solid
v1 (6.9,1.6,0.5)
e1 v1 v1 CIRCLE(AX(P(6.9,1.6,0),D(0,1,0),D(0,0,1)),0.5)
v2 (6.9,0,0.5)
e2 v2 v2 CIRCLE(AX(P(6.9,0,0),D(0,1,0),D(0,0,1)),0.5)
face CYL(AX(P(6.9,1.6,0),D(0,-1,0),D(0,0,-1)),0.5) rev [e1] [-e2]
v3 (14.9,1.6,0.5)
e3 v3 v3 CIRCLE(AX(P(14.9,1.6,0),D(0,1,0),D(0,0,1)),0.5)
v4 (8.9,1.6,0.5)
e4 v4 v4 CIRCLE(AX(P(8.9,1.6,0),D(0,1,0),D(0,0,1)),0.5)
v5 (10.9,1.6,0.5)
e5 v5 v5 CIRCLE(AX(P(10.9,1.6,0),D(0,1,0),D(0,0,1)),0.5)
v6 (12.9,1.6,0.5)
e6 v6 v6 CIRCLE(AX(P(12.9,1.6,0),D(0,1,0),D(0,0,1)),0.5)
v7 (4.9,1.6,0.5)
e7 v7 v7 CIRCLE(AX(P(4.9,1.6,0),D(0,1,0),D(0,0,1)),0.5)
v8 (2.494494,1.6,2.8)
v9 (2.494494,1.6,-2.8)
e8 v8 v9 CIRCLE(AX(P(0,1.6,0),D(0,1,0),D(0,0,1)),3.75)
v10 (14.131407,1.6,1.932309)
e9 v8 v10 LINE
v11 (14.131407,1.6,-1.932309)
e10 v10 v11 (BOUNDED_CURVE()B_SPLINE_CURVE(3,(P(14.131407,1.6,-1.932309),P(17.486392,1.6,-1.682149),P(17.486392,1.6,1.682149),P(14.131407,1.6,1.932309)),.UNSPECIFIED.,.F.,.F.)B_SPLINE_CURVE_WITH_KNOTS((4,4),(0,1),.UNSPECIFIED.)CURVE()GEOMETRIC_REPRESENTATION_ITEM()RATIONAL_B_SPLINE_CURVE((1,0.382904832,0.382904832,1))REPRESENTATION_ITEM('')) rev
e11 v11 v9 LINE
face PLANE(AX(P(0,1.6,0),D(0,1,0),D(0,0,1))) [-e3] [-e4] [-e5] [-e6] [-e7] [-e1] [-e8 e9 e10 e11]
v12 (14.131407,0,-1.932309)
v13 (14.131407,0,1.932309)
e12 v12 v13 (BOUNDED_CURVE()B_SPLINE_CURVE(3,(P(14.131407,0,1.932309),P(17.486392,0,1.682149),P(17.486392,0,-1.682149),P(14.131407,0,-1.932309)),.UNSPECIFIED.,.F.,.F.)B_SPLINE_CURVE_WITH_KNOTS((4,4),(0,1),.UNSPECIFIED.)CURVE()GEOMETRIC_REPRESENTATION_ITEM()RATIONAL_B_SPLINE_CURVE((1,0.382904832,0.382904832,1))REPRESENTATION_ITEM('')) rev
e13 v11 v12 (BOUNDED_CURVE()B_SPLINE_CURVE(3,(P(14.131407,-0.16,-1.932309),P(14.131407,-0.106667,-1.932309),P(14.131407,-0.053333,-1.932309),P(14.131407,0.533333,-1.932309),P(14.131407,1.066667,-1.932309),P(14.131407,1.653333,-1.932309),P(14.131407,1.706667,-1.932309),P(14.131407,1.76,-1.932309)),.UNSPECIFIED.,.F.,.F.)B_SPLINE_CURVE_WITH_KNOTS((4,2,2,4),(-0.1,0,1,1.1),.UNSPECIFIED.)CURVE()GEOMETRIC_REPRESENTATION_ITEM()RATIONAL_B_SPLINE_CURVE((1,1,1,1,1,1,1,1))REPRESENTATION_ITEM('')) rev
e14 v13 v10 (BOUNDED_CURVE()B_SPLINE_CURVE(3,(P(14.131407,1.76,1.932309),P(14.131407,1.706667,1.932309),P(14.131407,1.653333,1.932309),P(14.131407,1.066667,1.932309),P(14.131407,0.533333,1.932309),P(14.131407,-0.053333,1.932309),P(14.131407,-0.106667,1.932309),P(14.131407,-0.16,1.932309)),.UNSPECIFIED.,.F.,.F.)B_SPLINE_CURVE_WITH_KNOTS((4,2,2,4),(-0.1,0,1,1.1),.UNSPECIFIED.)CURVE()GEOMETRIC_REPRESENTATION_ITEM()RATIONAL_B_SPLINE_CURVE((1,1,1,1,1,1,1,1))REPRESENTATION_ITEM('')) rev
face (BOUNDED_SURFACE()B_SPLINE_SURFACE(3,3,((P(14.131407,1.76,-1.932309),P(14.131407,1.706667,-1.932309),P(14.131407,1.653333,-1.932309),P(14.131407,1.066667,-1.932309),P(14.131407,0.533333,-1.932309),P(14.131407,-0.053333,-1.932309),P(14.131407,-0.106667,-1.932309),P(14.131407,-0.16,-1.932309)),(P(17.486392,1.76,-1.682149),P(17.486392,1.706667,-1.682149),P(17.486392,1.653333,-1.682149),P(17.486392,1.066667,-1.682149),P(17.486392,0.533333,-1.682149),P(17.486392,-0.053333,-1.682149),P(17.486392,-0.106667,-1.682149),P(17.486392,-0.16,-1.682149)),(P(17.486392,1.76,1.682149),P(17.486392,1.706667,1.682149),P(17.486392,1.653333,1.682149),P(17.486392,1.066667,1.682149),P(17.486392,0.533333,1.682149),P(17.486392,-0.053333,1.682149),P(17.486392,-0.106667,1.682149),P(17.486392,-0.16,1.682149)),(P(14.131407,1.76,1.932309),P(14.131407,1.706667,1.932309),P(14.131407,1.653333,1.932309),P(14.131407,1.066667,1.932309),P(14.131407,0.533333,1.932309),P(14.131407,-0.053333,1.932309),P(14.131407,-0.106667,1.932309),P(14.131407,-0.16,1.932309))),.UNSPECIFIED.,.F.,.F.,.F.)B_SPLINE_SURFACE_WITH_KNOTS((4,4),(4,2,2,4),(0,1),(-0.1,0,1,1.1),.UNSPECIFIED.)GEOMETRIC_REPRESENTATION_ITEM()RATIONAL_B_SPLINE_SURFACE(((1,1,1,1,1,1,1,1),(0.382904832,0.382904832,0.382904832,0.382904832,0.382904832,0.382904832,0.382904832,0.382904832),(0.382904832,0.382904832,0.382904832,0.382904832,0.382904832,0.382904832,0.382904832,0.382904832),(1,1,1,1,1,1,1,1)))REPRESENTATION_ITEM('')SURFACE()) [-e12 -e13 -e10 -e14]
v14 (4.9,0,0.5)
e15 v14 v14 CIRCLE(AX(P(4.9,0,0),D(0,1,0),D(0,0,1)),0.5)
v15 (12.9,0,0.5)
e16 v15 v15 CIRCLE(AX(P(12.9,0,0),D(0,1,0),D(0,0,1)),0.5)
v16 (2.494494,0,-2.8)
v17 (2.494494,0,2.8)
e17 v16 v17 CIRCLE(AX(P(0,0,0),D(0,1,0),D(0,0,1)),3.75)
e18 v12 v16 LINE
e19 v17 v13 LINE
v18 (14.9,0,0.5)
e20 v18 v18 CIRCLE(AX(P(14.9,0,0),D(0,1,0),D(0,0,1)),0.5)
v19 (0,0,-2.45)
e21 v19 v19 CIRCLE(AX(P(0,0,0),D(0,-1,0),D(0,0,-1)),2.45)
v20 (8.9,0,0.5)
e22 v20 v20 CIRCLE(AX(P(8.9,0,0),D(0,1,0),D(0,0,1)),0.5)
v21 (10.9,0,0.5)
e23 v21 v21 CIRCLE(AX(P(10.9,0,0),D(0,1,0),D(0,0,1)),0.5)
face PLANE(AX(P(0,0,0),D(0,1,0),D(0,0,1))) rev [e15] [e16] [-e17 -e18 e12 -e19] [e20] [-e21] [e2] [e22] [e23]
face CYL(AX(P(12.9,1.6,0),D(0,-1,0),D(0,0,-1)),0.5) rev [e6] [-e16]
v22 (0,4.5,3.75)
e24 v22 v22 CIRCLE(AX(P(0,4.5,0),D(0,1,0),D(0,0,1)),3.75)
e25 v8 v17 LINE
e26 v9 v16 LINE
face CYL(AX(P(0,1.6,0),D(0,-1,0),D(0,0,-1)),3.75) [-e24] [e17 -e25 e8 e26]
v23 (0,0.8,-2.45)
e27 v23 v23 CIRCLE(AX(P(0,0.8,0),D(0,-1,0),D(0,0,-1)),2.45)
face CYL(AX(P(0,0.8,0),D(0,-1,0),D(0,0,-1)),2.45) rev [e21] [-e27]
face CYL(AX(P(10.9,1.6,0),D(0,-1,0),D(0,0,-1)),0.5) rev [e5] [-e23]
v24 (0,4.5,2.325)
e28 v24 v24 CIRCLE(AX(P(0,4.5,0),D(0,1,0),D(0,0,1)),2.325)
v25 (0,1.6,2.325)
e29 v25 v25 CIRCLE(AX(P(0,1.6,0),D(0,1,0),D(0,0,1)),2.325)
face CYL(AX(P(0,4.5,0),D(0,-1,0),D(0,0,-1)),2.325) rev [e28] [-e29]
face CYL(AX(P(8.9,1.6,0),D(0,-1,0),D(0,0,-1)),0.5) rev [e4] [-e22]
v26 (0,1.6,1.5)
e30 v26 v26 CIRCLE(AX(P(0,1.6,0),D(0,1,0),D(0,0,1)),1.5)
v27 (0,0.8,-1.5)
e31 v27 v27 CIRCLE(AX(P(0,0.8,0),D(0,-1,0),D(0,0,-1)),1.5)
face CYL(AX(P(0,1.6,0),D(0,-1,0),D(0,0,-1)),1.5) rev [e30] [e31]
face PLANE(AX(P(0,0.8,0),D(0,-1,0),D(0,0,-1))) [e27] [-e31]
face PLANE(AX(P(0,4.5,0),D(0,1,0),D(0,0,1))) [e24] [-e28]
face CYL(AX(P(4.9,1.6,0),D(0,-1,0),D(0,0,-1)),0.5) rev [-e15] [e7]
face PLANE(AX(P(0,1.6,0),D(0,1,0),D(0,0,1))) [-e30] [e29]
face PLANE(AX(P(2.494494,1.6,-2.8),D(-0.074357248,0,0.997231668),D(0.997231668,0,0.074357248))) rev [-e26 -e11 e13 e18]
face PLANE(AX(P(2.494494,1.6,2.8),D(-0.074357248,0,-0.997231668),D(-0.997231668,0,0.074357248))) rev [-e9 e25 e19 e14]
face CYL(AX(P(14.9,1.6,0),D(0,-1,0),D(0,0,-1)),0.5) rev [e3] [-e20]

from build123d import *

# Parameters (mm, degrees)
SKETCH1_R               = 0.5
SKETCH1_R_2             = 1.5
BOSS_EXTRUDE1_DEPTH     = 1.6
SKETCH2_R               = 3.75
SKETCH2_R_2             = 2.325
BOSS_EXTRUDE2_DEPTH     = 2.9
FILLET1_START           = -1
FILLET1_DEPTH           = 4
FILLET2_START           = -1
FILLET2_DEPTH           = 4
SKETCH3_R               = 2.45
CUT_EXTRUDE1_DEPTH      = 0.8
ENL_V_START             = -10
ENL_V_MAT_EXTRU_1_DEPTH = 10


with BuildPart() as part:
    # Sketch1 → Boss-Extrude1 (new body)
    with BuildSketch(Plane(origin=(0, 0, 0), x_dir=(1, 0, 0), z_dir=(0, 1, 0))):
        with BuildLine():
            Line((2.494493937, 2.8), (14.9, 1.875))
            ThreePointArc((14.9, 1.875), (15.925, 0), (14.9, -1.875))
            Line((14.9, -1.875), (2.494493937, -2.8))
            ThreePointArc((2.494493937, -2.8), (0, -3.75), (-2.494493937, -2.8))
            Line((-2.494493937, -2.8), (-14.9, -1.875))
            ThreePointArc((-14.9, -1.875), (-15.925, 0), (-14.9, 1.875))
            Line((-14.9, 1.875), (-2.494493937, 2.8))
            ThreePointArc((-2.494493937, 2.8), (0, 3.75), (2.494493937, 2.8))
        make_face()
        with Locations(Location((4.9, 0, 0), (0, 0, 270))):
            Circle(SKETCH1_R, mode=Mode.SUBTRACT)
        with Locations(Location((6.9, 0, 0), (0, 0, 270))):
            Circle(SKETCH1_R, mode=Mode.SUBTRACT)
        with Locations(Location((8.9, 0, 0), (0, 0, 270))):
            Circle(SKETCH1_R, mode=Mode.SUBTRACT)
        with Locations(Location((10.9, 0, 0), (0, 0, 270))):
            Circle(SKETCH1_R, mode=Mode.SUBTRACT)
        with Locations(Location((12.9, 0, 0), (0, 0, 270))):
            Circle(SKETCH1_R, mode=Mode.SUBTRACT)
        with Locations(Location((14.9, 0, 0), (0, 0, 270))):
            Circle(SKETCH1_R, mode=Mode.SUBTRACT)
        with Locations(Location((-14.9, 0, 0), (0, 0, 90))):
            Circle(SKETCH1_R, mode=Mode.SUBTRACT)
        with Locations(Location((-12.9, 0, 0), (0, 0, 90))):
            Circle(SKETCH1_R, mode=Mode.SUBTRACT)
        with Locations(Location((-10.9, 0, 0), (0, 0, 90))):
            Circle(SKETCH1_R, mode=Mode.SUBTRACT)
        with Locations(Location((-8.9, 0, 0), (0, 0, 90))):
            Circle(SKETCH1_R, mode=Mode.SUBTRACT)
        with Locations(Location((-6.9, 0, 0), (0, 0, 90))):
            Circle(SKETCH1_R, mode=Mode.SUBTRACT)
        with Locations(Location((-4.9, 0, 0), (0, 0, 90))):
            Circle(SKETCH1_R, mode=Mode.SUBTRACT)
        with Locations(Location((0, 0, 0), (0, 0, 270))):
            Circle(SKETCH1_R_2, mode=Mode.SUBTRACT)
    extrude(amount=BOSS_EXTRUDE1_DEPTH)

    # Sketch2 → Boss-Extrude2 (add)
    with BuildSketch(Plane(origin=(0, 1.6, 0), x_dir=(1, 0, 0), z_dir=(0, 1, 0))):
        with Locations(Location((0, 0, 0), (0, 0, 48.302453397))):
            Circle(SKETCH2_R)
        with Locations(Location((0, 0, 0), (0, 0, 270))):
            Circle(SKETCH2_R_2, mode=Mode.SUBTRACT)
    extrude(amount=BOSS_EXTRUDE2_DEPTH)

    # Fillet1: read off the stored shape, not the designer's step
    # Fillet1 outline → Fillet1 (cut)
    with BuildSketch(Plane(origin=(0, 0, 0), x_dir=(1, 0, 0), z_dir=(0, 1, 0)).offset(FILLET1_START)):
        with BuildLine():
            Line((-14.9, -1.875), (-14.131406802, -1.932309126))
            add(Edge.make_bspline(
                [(-14.131406802, -1.932309126), (-15.060349902, -1.863043724), (-15.925, -1.199048162), (-15.925, 0)],
                knots=[0, 0, 0, 0, 0.5, 0.5, 0.5, 0.5], degree=3, weights=[1, 0.691452416, 0.537178624, 0.537178624]))
            ThreePointArc((-15.925, 0), (-15.652023077, -1.068439282), (-14.9, -1.875))
        make_face()
        with BuildLine():
            ThreePointArc((-14.9, 1.875), (-15.652023077, 1.068439282), (-15.925, 0))
            add(Edge.make_bspline(
                [(-15.925, 0), (-15.925, 1.199048162), (-15.060349902, 1.863043724), (-14.131406802, 1.932309126)],
                knots=[0.5, 0.5, 0.5, 0.5, 1, 1, 1, 1], degree=3, weights=[0.537178624, 0.537178624, 0.691452416, 1]))
            Line((-14.131406802, 1.932309126), (-14.9, 1.875))
        make_face()
    extrude(amount=FILLET1_DEPTH, mode=Mode.SUBTRACT)

    # Fillet2: read off the stored shape, not the designer's step
    # Fillet2 outline → Fillet2 (cut)
    with BuildSketch(Plane(origin=(0, 0, 0), x_dir=(1, 0, 0), z_dir=(0, 1, 0)).offset(FILLET2_START)):
        with BuildLine():
            Line((14.9, 1.875), (14.131406802, 1.932309126))
            add(Edge.make_bspline(
                [(14.131406802, 1.932309126), (15.060349902, 1.863043724), (15.925, 1.199048162), (15.925, 0)],
                knots=[0, 0, 0, 0, 0.5, 0.5, 0.5, 0.5], degree=3, weights=[1, 0.691452416, 0.537178624, 0.537178624]))
            ThreePointArc((15.925, 0), (15.652023077, 1.068439282), (14.9, 1.875))
        make_face()
        with BuildLine():
            ThreePointArc((14.9, -1.875), (15.652023077, -1.068439282), (15.925, 0))
            add(Edge.make_bspline(
                [(15.925, 0), (15.925, -1.199048162), (15.060349902, -1.863043724), (14.131406802, -1.932309126)],
                knots=[0.5, 0.5, 0.5, 0.5, 1, 1, 1, 1], degree=3, weights=[0.537178624, 0.537178624, 0.691452416, 1]))
            Line((14.131406802, -1.932309126), (14.9, -1.875))
        make_face()
    extrude(amount=FILLET2_DEPTH, mode=Mode.SUBTRACT)

    # Sketch3 → Cut-Extrude1 (cut)
    with BuildSketch(Plane.XZ):
        with Locations(Location((0, 0, 0), (0, 0, 270))):
            Circle(SKETCH3_R)
    extrude(amount=-CUT_EXTRUDE1_DEPTH, mode=Mode.SUBTRACT)

    # Esquisse1 → Enlèv. mat.-Extru.1 (cut)
    with BuildSketch(Plane(origin=(0, 1.6, 0), x_dir=(1, 0, 0), z_dir=(0, 1, 0)).offset(ENL_V_START)):
        with BuildLine():
            Line((-2.494493937, 2.8), (-5.326259476, 9.645712634))
            Line((-5.326259476, 9.645712634), (-26.688602042, 9.645712634))
            Line((-26.688602042, 9.645712634), (-23.449621421, -3.244588312))
            Line((-23.449621421, -3.244588312), (-9.542304725, -12.289889455))
            Line((-9.542304725, -12.289889455), (-2.045012757, -5.407049631))
            Line((-2.045012757, -5.407049631), (-2.494493937, -2.8))
            ThreePointArc((-2.494493937, -2.8), (-3.75, 0), (-2.494493937, 2.8))
        make_face()
    extrude(amount=ENL_V_MAT_EXTRU_1_DEPTH, mode=Mode.SUBTRACT)


solid = part.part
